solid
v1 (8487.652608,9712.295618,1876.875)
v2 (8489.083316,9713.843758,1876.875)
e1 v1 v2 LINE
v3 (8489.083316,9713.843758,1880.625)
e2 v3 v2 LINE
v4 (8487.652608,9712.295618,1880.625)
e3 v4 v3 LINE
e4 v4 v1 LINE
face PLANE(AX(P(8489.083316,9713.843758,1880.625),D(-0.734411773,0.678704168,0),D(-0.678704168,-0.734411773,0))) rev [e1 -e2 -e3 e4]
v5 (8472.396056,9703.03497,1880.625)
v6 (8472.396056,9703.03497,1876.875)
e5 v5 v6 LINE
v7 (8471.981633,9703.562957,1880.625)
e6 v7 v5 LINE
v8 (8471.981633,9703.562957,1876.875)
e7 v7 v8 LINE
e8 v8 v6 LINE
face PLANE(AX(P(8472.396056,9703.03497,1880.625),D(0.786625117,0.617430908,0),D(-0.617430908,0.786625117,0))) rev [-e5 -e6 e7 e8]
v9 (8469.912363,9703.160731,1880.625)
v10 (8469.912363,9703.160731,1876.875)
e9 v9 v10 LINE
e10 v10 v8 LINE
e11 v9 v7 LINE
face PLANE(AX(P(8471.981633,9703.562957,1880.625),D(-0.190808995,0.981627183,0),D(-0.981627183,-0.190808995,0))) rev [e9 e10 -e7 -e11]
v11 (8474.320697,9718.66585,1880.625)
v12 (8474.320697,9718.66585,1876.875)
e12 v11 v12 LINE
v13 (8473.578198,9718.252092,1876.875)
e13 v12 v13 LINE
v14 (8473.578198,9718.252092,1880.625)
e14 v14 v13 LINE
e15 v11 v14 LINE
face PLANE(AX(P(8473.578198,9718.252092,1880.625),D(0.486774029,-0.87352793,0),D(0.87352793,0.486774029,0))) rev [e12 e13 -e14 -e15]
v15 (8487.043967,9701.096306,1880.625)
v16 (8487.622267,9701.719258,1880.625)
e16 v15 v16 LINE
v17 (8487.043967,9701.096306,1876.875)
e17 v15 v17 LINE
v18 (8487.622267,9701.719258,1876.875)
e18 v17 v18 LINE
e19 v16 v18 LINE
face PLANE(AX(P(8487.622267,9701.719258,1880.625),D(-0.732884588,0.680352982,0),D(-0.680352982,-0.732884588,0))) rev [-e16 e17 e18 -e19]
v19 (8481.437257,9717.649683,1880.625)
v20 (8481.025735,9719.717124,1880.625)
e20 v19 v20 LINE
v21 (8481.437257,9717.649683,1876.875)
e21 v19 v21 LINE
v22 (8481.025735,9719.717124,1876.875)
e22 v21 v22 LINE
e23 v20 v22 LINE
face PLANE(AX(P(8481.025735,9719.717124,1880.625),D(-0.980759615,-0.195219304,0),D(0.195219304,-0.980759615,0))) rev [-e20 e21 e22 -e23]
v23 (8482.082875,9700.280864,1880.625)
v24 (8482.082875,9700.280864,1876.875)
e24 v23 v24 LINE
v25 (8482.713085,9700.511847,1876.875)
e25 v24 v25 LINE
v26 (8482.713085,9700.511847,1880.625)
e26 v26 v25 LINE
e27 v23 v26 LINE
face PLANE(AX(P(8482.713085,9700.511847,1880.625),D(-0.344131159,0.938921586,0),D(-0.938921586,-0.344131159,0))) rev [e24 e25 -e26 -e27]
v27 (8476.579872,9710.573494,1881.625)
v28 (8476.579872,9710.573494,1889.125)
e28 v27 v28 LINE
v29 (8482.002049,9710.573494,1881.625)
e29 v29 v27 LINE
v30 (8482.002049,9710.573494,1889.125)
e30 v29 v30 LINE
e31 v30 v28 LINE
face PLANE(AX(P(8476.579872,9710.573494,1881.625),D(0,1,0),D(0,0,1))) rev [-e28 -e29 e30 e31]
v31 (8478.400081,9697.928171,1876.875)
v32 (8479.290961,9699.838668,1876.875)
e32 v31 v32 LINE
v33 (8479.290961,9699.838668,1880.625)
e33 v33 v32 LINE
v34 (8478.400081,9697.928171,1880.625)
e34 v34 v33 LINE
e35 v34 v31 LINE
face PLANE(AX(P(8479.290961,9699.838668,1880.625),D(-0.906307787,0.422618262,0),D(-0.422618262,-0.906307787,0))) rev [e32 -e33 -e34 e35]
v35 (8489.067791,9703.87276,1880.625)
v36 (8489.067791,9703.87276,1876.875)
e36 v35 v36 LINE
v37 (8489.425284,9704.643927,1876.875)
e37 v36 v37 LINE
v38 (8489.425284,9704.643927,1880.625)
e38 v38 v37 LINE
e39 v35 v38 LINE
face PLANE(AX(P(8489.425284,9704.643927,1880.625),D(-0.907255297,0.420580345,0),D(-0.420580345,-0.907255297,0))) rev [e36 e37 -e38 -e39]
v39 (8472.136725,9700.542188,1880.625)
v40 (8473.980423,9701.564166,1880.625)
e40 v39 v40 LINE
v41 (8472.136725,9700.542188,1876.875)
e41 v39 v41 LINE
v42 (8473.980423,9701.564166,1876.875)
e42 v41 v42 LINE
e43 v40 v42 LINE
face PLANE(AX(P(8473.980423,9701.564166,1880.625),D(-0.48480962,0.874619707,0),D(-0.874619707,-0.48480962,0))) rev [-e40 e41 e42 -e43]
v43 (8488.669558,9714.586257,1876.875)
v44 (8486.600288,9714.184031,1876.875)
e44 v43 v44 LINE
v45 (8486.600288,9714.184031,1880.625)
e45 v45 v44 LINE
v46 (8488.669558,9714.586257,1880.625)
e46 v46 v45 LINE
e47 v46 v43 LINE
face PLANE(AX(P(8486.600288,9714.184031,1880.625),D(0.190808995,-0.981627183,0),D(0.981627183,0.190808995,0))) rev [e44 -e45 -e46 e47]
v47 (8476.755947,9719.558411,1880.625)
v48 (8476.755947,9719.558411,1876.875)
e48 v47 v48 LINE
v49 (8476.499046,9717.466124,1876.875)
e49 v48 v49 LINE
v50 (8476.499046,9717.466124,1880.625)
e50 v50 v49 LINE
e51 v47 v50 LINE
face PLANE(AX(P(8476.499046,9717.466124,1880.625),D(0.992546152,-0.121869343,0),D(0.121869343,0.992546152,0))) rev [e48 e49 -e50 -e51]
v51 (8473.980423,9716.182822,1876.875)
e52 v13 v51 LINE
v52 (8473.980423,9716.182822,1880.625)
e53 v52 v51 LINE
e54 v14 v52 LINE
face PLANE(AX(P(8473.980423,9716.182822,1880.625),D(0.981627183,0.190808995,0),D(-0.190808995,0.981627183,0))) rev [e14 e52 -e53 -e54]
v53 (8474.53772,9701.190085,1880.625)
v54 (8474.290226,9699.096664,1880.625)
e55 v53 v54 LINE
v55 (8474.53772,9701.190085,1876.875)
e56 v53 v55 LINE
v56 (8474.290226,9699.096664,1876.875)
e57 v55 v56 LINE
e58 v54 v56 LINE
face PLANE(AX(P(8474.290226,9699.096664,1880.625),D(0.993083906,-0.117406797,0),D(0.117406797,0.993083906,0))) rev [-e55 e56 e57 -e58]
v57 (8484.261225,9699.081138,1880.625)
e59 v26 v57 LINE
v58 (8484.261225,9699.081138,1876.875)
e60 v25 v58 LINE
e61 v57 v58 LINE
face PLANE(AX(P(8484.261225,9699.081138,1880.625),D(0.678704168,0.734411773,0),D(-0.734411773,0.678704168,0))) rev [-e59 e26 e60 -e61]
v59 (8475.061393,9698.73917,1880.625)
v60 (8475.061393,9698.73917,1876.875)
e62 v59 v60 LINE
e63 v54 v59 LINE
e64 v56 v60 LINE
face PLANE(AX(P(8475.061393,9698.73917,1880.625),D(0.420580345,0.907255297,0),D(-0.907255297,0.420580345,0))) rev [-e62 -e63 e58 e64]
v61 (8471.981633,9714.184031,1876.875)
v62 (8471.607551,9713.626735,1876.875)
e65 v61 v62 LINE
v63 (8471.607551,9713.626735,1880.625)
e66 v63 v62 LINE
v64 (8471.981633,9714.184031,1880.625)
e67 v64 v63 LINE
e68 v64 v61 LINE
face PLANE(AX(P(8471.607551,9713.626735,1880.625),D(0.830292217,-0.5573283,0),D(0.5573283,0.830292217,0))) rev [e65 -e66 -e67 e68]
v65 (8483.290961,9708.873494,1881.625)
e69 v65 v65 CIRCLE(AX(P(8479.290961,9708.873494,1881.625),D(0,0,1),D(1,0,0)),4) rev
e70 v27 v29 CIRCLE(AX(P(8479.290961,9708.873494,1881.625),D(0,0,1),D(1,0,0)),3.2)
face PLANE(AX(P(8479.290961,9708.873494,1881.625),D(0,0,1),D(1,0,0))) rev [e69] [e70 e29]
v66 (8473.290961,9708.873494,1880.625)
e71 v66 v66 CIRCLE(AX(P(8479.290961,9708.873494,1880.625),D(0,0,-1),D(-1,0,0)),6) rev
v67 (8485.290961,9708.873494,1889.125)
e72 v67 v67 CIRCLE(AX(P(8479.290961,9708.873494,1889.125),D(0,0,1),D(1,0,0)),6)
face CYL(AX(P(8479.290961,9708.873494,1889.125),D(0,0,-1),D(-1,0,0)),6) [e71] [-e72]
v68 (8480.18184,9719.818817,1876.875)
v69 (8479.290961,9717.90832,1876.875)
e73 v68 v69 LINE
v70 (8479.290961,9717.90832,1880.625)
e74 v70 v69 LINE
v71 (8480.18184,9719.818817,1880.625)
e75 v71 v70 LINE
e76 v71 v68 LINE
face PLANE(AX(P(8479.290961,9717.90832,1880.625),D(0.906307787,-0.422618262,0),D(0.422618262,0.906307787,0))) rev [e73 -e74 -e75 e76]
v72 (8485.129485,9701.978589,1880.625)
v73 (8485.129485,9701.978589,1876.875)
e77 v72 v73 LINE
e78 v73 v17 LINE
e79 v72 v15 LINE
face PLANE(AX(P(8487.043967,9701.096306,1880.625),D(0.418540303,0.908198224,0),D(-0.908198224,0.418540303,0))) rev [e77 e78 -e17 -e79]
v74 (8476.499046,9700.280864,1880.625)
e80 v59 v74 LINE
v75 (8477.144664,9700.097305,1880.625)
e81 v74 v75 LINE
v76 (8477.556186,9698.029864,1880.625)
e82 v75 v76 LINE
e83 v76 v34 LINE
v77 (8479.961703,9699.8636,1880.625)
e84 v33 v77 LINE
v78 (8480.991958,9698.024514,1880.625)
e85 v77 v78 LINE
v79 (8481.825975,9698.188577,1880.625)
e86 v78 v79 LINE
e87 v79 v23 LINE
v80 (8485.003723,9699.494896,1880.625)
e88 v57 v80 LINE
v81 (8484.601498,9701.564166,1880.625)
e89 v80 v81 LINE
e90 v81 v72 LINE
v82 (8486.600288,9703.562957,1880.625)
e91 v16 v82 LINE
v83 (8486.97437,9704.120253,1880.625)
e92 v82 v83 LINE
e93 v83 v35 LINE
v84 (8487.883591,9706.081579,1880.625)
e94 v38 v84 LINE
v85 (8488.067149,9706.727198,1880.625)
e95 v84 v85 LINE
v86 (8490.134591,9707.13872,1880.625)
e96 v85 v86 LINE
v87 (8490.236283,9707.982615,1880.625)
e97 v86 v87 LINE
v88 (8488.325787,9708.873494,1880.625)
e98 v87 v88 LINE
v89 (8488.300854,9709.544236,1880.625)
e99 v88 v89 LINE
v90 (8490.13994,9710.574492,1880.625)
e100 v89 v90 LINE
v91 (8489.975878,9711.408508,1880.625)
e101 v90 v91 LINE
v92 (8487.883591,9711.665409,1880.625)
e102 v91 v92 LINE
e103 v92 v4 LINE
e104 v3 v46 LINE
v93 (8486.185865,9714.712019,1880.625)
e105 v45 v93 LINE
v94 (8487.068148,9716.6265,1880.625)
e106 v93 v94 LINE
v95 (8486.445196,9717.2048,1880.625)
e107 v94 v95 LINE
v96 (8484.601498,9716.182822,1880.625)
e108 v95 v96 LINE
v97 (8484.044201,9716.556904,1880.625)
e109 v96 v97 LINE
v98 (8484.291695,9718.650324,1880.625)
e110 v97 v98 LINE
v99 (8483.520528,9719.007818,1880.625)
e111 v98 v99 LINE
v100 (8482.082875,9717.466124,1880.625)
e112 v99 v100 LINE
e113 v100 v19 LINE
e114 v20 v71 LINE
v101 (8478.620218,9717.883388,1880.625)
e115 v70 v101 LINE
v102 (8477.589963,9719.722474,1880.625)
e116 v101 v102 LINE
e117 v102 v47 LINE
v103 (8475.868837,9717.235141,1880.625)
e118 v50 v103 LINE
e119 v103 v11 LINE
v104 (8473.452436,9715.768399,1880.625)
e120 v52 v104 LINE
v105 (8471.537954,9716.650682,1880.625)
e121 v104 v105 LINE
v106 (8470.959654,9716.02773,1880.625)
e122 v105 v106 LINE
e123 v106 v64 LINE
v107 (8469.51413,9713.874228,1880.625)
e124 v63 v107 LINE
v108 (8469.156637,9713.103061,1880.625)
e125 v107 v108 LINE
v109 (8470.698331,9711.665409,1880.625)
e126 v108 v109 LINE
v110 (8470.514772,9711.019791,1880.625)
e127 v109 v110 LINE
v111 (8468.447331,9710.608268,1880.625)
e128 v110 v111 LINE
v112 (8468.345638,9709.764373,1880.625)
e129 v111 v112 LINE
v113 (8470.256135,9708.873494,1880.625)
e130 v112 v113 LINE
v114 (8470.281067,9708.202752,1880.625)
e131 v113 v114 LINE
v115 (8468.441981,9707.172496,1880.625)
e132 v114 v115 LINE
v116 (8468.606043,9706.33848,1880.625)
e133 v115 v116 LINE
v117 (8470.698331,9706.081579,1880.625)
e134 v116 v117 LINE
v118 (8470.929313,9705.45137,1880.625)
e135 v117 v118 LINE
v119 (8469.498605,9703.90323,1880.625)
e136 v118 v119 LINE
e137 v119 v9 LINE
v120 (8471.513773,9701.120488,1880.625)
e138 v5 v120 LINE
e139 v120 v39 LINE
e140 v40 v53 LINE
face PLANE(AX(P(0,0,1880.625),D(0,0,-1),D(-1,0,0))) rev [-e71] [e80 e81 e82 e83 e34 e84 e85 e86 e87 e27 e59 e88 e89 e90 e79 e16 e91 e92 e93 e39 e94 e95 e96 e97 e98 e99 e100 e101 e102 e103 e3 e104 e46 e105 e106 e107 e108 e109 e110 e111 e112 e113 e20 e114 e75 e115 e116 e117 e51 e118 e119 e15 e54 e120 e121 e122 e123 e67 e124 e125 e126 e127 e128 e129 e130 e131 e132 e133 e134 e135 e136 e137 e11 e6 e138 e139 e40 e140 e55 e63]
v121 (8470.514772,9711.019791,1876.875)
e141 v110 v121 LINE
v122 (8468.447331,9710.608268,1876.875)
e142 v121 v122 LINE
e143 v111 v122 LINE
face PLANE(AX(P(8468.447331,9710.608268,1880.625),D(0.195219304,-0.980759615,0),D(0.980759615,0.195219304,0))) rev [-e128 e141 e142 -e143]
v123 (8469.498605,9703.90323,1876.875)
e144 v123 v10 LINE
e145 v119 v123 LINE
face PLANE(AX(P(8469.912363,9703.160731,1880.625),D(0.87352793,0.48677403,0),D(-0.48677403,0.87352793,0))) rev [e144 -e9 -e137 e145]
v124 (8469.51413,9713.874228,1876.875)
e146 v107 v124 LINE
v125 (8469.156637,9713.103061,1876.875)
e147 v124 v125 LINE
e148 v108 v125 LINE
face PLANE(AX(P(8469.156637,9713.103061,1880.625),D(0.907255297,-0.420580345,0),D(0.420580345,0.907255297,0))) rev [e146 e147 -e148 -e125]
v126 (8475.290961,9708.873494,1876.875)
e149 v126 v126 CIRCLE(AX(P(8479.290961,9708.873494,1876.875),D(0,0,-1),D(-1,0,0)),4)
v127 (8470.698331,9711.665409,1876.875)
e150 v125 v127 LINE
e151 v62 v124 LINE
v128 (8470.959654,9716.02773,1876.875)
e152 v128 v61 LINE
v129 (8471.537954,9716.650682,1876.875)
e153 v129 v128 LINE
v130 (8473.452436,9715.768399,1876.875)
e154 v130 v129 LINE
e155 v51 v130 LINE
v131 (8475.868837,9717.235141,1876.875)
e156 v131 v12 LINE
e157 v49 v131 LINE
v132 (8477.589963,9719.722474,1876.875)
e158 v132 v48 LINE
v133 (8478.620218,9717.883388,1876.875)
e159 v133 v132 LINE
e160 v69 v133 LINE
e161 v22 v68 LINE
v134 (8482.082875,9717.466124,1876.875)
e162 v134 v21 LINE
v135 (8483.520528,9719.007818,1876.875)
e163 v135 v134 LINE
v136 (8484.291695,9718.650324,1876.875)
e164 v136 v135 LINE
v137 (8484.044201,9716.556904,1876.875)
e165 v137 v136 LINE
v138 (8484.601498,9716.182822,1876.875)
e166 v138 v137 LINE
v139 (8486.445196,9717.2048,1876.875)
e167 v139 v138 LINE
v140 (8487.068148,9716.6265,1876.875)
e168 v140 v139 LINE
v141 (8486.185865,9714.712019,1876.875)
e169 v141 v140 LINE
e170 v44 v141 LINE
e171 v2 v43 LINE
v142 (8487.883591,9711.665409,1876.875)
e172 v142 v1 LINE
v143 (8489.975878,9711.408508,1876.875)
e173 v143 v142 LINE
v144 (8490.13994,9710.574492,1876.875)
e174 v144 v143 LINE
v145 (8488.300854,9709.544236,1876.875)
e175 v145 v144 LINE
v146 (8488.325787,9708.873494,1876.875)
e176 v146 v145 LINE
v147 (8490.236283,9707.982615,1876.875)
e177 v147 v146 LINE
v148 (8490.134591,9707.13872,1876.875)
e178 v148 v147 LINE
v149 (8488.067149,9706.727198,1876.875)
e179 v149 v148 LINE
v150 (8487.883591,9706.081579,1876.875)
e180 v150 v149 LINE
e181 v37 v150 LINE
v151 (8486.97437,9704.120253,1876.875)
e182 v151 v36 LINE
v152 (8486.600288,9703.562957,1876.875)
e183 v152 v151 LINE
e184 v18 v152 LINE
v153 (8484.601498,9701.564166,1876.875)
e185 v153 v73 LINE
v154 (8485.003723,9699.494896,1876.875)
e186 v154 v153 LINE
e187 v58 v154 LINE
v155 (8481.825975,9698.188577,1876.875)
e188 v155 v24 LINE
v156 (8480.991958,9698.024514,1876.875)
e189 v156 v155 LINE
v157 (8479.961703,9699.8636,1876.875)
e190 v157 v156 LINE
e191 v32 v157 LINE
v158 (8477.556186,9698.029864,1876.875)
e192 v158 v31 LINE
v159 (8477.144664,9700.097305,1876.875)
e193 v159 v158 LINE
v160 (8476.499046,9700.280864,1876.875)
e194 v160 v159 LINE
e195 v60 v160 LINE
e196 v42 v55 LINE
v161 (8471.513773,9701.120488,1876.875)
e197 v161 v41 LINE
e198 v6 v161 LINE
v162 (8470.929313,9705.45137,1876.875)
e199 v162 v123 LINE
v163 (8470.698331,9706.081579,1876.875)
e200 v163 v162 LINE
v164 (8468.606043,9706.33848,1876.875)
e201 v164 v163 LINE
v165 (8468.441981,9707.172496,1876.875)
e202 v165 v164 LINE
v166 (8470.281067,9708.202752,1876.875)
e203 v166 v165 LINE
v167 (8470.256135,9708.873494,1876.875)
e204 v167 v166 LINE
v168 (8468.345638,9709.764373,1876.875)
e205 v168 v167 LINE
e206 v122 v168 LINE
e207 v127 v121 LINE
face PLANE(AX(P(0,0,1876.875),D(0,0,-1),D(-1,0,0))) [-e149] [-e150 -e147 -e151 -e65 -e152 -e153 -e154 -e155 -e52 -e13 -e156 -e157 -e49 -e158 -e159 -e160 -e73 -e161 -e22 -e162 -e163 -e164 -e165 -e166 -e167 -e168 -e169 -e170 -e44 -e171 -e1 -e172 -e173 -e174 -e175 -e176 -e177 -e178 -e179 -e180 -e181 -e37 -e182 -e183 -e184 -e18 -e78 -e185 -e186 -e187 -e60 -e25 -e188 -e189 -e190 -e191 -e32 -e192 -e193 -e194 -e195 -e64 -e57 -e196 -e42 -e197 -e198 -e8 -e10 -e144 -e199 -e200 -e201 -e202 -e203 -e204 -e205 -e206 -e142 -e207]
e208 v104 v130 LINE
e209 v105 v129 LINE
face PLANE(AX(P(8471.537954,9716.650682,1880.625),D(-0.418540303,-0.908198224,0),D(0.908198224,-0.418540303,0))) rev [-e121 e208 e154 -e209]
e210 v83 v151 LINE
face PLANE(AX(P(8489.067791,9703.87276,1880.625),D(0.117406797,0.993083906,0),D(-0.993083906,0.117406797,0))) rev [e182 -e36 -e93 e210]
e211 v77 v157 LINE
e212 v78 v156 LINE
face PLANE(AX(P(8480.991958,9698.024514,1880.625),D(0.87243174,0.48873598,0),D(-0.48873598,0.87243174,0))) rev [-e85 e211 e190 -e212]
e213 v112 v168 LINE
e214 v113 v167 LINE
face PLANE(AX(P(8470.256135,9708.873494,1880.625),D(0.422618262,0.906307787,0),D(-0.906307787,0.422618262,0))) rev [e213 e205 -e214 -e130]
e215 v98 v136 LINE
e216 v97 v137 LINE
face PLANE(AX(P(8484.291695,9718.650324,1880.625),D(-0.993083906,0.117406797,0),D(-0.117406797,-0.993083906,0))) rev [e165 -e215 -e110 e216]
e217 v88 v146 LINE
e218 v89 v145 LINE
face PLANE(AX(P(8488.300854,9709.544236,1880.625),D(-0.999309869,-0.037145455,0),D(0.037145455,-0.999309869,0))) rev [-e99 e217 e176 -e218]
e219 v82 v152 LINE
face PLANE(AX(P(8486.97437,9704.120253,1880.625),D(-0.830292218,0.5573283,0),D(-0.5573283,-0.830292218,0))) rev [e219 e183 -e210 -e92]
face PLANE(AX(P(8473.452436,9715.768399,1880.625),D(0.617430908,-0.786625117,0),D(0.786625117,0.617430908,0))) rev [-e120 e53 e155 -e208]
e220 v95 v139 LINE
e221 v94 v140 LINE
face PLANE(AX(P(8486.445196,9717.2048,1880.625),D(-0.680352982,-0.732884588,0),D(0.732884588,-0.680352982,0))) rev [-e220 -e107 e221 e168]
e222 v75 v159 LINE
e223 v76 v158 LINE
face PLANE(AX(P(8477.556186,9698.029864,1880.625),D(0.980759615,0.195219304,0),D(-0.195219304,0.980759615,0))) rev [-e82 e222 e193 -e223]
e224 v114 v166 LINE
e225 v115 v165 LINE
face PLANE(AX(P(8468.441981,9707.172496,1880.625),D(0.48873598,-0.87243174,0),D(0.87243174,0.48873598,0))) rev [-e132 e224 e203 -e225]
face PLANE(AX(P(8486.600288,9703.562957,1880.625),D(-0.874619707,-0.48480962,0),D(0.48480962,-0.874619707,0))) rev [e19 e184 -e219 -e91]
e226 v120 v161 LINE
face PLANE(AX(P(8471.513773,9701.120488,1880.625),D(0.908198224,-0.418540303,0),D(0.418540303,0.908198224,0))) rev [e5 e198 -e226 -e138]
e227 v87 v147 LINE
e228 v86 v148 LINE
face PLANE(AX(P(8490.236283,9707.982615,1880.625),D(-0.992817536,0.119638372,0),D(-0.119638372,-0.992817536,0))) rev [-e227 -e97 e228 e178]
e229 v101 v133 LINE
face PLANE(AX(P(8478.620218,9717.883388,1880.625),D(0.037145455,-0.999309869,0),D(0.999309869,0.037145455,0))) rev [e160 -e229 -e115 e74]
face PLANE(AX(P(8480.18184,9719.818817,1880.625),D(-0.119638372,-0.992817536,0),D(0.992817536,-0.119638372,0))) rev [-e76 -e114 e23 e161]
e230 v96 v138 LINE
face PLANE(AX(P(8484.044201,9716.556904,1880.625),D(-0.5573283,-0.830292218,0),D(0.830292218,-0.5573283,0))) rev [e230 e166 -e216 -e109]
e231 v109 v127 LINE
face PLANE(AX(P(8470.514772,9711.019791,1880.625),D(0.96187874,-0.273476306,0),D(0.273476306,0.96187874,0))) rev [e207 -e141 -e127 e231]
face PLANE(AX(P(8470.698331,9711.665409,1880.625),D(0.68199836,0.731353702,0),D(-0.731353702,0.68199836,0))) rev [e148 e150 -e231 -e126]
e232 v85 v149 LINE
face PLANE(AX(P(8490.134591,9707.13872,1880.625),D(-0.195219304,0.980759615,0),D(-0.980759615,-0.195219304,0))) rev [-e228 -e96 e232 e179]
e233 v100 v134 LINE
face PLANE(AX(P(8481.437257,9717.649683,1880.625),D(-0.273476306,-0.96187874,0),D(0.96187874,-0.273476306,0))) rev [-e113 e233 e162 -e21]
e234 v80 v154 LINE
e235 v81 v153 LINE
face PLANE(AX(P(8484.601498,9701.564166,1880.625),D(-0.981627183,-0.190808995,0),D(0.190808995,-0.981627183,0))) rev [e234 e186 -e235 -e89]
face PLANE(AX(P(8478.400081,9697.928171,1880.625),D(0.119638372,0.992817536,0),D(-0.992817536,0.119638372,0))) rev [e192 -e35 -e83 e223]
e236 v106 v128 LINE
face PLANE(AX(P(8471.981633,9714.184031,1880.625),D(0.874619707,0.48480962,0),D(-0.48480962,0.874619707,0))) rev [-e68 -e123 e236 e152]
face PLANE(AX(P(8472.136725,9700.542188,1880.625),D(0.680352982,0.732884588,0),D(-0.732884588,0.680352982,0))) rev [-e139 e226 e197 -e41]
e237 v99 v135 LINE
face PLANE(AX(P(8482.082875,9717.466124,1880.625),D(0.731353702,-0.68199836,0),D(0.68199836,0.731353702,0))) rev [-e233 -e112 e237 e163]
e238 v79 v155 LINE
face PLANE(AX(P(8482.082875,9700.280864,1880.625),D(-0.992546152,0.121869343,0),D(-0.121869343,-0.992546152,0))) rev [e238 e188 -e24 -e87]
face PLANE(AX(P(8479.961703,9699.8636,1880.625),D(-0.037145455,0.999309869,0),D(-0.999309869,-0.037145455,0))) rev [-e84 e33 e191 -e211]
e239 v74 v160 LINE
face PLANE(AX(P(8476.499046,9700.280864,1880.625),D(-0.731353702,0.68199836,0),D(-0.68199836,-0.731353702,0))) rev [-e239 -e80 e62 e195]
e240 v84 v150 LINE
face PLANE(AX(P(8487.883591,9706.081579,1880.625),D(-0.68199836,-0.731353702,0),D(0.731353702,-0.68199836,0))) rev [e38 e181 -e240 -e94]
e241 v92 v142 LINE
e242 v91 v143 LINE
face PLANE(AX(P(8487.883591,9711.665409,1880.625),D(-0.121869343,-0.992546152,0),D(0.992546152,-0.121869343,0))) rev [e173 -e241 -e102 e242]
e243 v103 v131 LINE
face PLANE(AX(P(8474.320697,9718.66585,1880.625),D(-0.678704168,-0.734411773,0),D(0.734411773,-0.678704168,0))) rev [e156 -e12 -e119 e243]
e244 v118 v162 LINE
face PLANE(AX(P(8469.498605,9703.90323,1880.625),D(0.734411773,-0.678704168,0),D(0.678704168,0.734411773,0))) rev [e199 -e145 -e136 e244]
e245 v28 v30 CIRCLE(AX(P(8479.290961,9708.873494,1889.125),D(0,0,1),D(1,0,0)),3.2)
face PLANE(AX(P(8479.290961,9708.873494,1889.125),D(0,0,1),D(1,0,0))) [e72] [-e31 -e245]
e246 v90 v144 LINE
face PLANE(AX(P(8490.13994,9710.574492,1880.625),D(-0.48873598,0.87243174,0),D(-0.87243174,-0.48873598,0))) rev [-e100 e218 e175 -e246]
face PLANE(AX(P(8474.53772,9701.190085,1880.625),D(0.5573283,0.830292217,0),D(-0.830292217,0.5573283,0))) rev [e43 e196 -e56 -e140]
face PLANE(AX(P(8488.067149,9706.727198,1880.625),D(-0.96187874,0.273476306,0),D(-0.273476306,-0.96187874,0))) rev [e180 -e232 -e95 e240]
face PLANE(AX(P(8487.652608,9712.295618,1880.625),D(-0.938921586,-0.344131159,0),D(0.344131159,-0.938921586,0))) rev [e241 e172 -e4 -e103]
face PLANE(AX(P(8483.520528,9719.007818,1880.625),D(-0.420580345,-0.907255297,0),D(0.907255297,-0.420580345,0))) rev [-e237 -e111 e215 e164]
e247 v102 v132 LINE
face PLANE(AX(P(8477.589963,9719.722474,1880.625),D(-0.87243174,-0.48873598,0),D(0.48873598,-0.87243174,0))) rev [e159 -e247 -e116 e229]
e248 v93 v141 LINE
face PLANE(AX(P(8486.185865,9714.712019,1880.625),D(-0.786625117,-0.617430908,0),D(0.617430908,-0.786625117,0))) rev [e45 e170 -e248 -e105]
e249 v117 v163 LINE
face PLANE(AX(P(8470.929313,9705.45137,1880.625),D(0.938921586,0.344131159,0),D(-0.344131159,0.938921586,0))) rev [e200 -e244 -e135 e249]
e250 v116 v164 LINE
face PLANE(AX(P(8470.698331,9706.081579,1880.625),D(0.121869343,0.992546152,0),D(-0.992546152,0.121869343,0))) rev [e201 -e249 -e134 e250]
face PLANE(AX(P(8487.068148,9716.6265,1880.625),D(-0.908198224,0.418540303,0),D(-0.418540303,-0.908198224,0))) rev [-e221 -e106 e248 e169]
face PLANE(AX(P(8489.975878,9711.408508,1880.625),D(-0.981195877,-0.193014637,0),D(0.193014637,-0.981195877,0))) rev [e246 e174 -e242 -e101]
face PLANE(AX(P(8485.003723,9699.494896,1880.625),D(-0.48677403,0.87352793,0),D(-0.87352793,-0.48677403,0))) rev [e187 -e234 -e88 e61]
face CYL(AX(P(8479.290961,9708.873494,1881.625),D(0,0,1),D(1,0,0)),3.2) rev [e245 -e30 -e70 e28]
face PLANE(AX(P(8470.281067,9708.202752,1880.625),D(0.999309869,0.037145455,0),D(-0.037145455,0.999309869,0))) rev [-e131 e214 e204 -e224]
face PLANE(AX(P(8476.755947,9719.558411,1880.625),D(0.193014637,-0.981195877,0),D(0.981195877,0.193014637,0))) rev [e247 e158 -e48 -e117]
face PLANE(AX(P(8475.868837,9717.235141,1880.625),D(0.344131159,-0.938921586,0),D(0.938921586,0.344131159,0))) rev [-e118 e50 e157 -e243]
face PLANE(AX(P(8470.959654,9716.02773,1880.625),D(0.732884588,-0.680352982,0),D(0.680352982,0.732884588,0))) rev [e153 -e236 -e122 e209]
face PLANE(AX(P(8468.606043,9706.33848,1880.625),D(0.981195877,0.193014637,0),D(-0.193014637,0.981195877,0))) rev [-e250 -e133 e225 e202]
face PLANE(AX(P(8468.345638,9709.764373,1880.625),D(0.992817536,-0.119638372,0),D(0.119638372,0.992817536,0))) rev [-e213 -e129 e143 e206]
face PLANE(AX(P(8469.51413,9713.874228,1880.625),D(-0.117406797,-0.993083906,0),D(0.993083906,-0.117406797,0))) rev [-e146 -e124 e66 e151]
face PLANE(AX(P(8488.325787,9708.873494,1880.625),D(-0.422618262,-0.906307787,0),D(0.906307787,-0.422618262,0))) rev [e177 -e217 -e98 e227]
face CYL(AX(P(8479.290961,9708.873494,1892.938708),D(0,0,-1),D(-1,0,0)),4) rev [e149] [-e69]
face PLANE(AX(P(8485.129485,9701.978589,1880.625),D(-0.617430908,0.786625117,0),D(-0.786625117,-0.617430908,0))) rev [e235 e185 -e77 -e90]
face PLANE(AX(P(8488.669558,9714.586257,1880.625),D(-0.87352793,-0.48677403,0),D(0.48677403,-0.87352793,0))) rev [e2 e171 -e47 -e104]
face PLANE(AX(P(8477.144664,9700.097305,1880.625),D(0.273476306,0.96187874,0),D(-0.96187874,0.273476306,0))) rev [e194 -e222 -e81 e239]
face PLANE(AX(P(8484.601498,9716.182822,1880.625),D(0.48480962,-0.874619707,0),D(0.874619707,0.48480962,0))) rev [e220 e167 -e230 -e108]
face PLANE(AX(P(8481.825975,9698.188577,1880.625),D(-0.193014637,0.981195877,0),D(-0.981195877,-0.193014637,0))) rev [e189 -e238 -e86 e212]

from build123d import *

# Parameters (mm, degrees)
BOSS_EXTRUDE1_DEPTH = 3750
SCALE1_SCALE        = 0.001
BOSS_EXTRUDE2_DEPTH = 3.75
SKETCH7_R           = 6
BOSS_EXTRUDE4_DEPTH = 8.5
CUT_EXTRUDE2_DEPTH  = 7.5
SKETCH9_R           = 4
CUT_EXTRUDE3_DEPTH  = 4.75


# Read off the part's stored shape, not the designer's step: Imported1
with BuildPart() as part:
    # Sketch1 → Boss-Extrude1 (new body)
    with BuildSketch(Plane.XY):
        Polygon((-1706.06803894, 17555.067062378), (-569.962084293, 15778.41758728), (-1006.988286972, 15208.873748779), (-3063.715457916, 15425.035476685), (-3388.391971588, 14641.19720459), (-1831.166863441, 13219.130516052), (-2105.892896652, 12555.883407593), (-4148.485660553, 12232.358932495), (-4259.226799011, 11391.19720459), (-2387.004852295, 10420.625686646), (-2480.708837509, 9708.873748779), (-4369.967937469, 8867.712020874), (-4259.226799011, 8026.550292969), (-2199.596881866, 7573.616504669), (-2105.892896652, 6861.864089966), (-3713.068246841, 5560.388088226), (-3388.391971588, 4776.549816132), (-1281.714439392, 4872.121334076), (-1006.988286972, 4208.873748779), (-2222.553491592, 2535.776615143), (-1706.06803894, 1862.679600716), (304.090321064, 2500.242710114), (741.116523743, 1930.699110031), (0, 0), (673.097014427, -516.485512257), (2449.747562408, 619.62044239), (3019.291162491, 182.594239712), (2803.129196167, -1874.132990837), (3586.967229843, -2198.8093853), (5009.034156799, -641.584277153), (5672.281742096, -916.310429573), (5995.805263519, -2958.903074265), (6836.967468262, -3069.644212723), (7807.538509369, -1197.422385216), (8519.290924072, -1291.12637043), (9360.452651978, -3180.385351181), (10201.615333557, -3069.644212723), (10654.54864502, -1010.014414787), (11366.300582886, -916.310429573), (12667.777061462, -2523.485660553), (13451.615333557, -2198.8093853), (13356.043815613, -92.131927609), (14019.290924072, 182.594239712), (15692.388534546, -1032.971024513), (16365.48614502, -516.485512257), (15727.922439575, 1493.672847748), (16297.466278076, 1930.699110031), (18228.164672852, 1189.582586288), (18744.649887085, 1862.679600716), (17608.543395996, 3639.330148697), (18045.570373535, 4208.873748779), (20102.296829224, 3992.711782455), (20426.973342896, 4776.549816132), (18869.749069214, 6198.616504669), (19144.47593689, 6861.864089966), (21187.06703186, 7185.388088226), (21297.80960083, 8026.550292969), (19425.586700439, 8997.120857239), (19519.290924072, 9708.873748779), (21408.550262451, 10550.035476685), (21297.80960083, 11391.19720459), (19238.178253174, 11844.130516052), (19144.47593689, 12555.883407593), (20751.649856567, 13857.358932495), (20426.973342896, 14641.19720459), (18320.297241211, 14545.625686646), (18045.570373535, 15208.873748779), (19261.135101318, 16881.971359253), (18744.649887085, 17555.067062378), (16734.491348267, 16917.505264282), (16297.466278076, 17487.049102783), (17038.581848145, 19417.747497559), (16365.48614502, 19934.232711792), (14588.834762573, 18798.126220703), (14019.290924072, 19235.153198242), (14235.452651978, 21291.879653931), (13451.615333557, 21616.556167603), (12029.54864502, 20059.331893921), (11366.300582886, 20334.056854248), (11042.777061462, 22376.649856567), (10201.615333557, 22487.392425537), (9231.043815613, 20615.169525146), (8519.290924072, 20708.873748779), (7678.129196167, 22598.133087158), (6836.967468262, 22487.392425537), (6384.034156799, 20427.761077881), (5672.281742096, 20334.056854248), (4370.805263519, 21941.232681274), (3586.967229843, 21616.556167603), (3682.538747787, 19509.880065918), (3019.291162491, 19235.153198242), (1346.194028854, 20450.717926025), (673.097014427, 19934.232711792), (1310.660123825, 17924.074172974), (741.116523743, 17487.049102783), (-1189.582586288, 18228.164672852), align=None)
    extrude(amount=BOSS_EXTRUDE1_DEPTH)


with BuildPart() as part_1:
    # Scale1: scaled about (8519.290960158, 9708.873493624, 1875)
    add(part.part.scale(SCALE1_SCALE).moved(Location((8510.771669198, 9699.16462013, 1873.125))))


with BuildPart() as body_2:
    # Sketch4 → Boss-Extrude2 (new body)
    with BuildSketch(Plane.XY.offset(1876.875)):
        Polygon((8482.082875407, 9717.46612407), (8483.52052795, 9719.007817674), (8484.291694952, 9718.650324381), (8484.044201424, 9716.556903507), (8484.601498068, 9716.182821727), (8486.44519641, 9717.204800407), (8487.06814831, 9716.626500372), (8486.185865351, 9714.712018515), (8486.600288328, 9714.184031467), (8488.669558431, 9714.586256829), (8489.083316356, 9713.843758089), (8487.65260797, 9712.295618071), (8487.883590672, 9711.665408806), (8489.975877959, 9711.40850823), (8490.139940401, 9710.574491734), (8488.300854292, 9709.544236288), (8488.325786523, 9708.873494079), (8490.236283338, 9707.982614784), (8490.134590722, 9707.138719878), (8488.067149452, 9706.727197584), (8487.883590672, 9706.081579353), (8489.425284275, 9704.64392681), (8489.067790982, 9703.872759808), (8486.974370108, 9704.120253336), (8486.600288328, 9703.562956692), (8487.622267008, 9701.71925835), (8487.043966973, 9701.09630645), (8485.129485116, 9701.978589409), (8484.601498068, 9701.564166432), (8485.00372343, 9699.494896329), (8484.26122469, 9699.081138404), (8482.713084672, 9700.51184679), (8482.082875407, 9700.280864088), (8481.825974831, 9698.188576801), (8480.991958335, 9698.024514359), (8479.961702889, 9699.863600468), (8479.29096068, 9699.838668237), (8478.400081385, 9697.928171422), (8477.556186479, 9698.029864038), (8477.144664185, 9700.097305308), (8476.499045954, 9700.280864088), (8475.061393411, 9698.739170485), (8474.290226409, 9699.096663778), (8474.537719937, 9701.190084652), (8473.980423293, 9701.564166432), (8472.136724951, 9700.542187752), (8471.513773051, 9701.120487787), (8472.39605601, 9703.034969644), (8471.981633033, 9703.562956692), (8469.91236293, 9703.16073133), (8469.498605005, 9703.90323007), (8470.929313391, 9705.451370088), (8470.698330689, 9706.081579353), (8468.606043402, 9706.338479929), (8468.44198096, 9707.172496425), (8470.281067069, 9708.202751871), (8470.256134838, 9708.873494079), (8468.345638023, 9709.764373375), (8468.447330639, 9710.608268281), (8470.514771909, 9711.019790575), (8470.698330689, 9711.665408806), (8469.156637086, 9713.103061349), (8469.514130379, 9713.874228351), (8471.607551253, 9713.626734823), (8471.981633033, 9714.184031467), (8470.959654353, 9716.027729809), (8471.537954388, 9716.650681709), (8473.452436245, 9715.76839875), (8473.980423293, 9716.182821727), (8473.578197931, 9718.25209183), (8474.320696671, 9718.665849755), (8475.868836689, 9717.235141369), (8476.499045954, 9717.46612407), (8476.75594653, 9719.558411358), (8477.589963026, 9719.7224738), (8478.620218472, 9717.883387691), (8479.29096068, 9717.908319922), (8480.181839976, 9719.818816737), (8481.025734882, 9719.71712412), (8481.437257176, 9717.649682851), align=None)
    extrude(amount=BOSS_EXTRUDE2_DEPTH)

    # Sketch7 → Boss-Extrude4 (add)
    with BuildSketch(Plane.XY.offset(1880.625)):
        with Locations(Location((8479.29096068, 9708.873494079, 0), (0, 0, 180))):
            Circle(SKETCH7_R)
    extrude(amount=BOSS_EXTRUDE4_DEPTH)

    # Sketch8 → Cut-Extrude2 (cut)
    with BuildSketch(Plane.XY.offset(1889.125)):
        with BuildLine():
            Line((8476.579872338, 9710.573494079), (8482.002049023, 9710.573494079))
            ThreePointArc((8482.002049023, 9710.573494079), (8479.29096068, 9705.673494079), (8476.579872338, 9710.573494079))
        make_face()
    extrude(amount=-CUT_EXTRUDE2_DEPTH, mode=Mode.SUBTRACT)

    # Sketch9 → Cut-Extrude3 (cut)
    with BuildSketch(Plane(origin=(0, 0, 1876.875), x_dir=(-1, 0, 0), z_dir=(0, 0, -1))):
        with Locations((-8479.29096068, 9708.873494079)):
            Circle(SKETCH9_R)
    extrude(amount=-CUT_EXTRUDE3_DEPTH, mode=Mode.SUBTRACT)


solid = body_2.part
